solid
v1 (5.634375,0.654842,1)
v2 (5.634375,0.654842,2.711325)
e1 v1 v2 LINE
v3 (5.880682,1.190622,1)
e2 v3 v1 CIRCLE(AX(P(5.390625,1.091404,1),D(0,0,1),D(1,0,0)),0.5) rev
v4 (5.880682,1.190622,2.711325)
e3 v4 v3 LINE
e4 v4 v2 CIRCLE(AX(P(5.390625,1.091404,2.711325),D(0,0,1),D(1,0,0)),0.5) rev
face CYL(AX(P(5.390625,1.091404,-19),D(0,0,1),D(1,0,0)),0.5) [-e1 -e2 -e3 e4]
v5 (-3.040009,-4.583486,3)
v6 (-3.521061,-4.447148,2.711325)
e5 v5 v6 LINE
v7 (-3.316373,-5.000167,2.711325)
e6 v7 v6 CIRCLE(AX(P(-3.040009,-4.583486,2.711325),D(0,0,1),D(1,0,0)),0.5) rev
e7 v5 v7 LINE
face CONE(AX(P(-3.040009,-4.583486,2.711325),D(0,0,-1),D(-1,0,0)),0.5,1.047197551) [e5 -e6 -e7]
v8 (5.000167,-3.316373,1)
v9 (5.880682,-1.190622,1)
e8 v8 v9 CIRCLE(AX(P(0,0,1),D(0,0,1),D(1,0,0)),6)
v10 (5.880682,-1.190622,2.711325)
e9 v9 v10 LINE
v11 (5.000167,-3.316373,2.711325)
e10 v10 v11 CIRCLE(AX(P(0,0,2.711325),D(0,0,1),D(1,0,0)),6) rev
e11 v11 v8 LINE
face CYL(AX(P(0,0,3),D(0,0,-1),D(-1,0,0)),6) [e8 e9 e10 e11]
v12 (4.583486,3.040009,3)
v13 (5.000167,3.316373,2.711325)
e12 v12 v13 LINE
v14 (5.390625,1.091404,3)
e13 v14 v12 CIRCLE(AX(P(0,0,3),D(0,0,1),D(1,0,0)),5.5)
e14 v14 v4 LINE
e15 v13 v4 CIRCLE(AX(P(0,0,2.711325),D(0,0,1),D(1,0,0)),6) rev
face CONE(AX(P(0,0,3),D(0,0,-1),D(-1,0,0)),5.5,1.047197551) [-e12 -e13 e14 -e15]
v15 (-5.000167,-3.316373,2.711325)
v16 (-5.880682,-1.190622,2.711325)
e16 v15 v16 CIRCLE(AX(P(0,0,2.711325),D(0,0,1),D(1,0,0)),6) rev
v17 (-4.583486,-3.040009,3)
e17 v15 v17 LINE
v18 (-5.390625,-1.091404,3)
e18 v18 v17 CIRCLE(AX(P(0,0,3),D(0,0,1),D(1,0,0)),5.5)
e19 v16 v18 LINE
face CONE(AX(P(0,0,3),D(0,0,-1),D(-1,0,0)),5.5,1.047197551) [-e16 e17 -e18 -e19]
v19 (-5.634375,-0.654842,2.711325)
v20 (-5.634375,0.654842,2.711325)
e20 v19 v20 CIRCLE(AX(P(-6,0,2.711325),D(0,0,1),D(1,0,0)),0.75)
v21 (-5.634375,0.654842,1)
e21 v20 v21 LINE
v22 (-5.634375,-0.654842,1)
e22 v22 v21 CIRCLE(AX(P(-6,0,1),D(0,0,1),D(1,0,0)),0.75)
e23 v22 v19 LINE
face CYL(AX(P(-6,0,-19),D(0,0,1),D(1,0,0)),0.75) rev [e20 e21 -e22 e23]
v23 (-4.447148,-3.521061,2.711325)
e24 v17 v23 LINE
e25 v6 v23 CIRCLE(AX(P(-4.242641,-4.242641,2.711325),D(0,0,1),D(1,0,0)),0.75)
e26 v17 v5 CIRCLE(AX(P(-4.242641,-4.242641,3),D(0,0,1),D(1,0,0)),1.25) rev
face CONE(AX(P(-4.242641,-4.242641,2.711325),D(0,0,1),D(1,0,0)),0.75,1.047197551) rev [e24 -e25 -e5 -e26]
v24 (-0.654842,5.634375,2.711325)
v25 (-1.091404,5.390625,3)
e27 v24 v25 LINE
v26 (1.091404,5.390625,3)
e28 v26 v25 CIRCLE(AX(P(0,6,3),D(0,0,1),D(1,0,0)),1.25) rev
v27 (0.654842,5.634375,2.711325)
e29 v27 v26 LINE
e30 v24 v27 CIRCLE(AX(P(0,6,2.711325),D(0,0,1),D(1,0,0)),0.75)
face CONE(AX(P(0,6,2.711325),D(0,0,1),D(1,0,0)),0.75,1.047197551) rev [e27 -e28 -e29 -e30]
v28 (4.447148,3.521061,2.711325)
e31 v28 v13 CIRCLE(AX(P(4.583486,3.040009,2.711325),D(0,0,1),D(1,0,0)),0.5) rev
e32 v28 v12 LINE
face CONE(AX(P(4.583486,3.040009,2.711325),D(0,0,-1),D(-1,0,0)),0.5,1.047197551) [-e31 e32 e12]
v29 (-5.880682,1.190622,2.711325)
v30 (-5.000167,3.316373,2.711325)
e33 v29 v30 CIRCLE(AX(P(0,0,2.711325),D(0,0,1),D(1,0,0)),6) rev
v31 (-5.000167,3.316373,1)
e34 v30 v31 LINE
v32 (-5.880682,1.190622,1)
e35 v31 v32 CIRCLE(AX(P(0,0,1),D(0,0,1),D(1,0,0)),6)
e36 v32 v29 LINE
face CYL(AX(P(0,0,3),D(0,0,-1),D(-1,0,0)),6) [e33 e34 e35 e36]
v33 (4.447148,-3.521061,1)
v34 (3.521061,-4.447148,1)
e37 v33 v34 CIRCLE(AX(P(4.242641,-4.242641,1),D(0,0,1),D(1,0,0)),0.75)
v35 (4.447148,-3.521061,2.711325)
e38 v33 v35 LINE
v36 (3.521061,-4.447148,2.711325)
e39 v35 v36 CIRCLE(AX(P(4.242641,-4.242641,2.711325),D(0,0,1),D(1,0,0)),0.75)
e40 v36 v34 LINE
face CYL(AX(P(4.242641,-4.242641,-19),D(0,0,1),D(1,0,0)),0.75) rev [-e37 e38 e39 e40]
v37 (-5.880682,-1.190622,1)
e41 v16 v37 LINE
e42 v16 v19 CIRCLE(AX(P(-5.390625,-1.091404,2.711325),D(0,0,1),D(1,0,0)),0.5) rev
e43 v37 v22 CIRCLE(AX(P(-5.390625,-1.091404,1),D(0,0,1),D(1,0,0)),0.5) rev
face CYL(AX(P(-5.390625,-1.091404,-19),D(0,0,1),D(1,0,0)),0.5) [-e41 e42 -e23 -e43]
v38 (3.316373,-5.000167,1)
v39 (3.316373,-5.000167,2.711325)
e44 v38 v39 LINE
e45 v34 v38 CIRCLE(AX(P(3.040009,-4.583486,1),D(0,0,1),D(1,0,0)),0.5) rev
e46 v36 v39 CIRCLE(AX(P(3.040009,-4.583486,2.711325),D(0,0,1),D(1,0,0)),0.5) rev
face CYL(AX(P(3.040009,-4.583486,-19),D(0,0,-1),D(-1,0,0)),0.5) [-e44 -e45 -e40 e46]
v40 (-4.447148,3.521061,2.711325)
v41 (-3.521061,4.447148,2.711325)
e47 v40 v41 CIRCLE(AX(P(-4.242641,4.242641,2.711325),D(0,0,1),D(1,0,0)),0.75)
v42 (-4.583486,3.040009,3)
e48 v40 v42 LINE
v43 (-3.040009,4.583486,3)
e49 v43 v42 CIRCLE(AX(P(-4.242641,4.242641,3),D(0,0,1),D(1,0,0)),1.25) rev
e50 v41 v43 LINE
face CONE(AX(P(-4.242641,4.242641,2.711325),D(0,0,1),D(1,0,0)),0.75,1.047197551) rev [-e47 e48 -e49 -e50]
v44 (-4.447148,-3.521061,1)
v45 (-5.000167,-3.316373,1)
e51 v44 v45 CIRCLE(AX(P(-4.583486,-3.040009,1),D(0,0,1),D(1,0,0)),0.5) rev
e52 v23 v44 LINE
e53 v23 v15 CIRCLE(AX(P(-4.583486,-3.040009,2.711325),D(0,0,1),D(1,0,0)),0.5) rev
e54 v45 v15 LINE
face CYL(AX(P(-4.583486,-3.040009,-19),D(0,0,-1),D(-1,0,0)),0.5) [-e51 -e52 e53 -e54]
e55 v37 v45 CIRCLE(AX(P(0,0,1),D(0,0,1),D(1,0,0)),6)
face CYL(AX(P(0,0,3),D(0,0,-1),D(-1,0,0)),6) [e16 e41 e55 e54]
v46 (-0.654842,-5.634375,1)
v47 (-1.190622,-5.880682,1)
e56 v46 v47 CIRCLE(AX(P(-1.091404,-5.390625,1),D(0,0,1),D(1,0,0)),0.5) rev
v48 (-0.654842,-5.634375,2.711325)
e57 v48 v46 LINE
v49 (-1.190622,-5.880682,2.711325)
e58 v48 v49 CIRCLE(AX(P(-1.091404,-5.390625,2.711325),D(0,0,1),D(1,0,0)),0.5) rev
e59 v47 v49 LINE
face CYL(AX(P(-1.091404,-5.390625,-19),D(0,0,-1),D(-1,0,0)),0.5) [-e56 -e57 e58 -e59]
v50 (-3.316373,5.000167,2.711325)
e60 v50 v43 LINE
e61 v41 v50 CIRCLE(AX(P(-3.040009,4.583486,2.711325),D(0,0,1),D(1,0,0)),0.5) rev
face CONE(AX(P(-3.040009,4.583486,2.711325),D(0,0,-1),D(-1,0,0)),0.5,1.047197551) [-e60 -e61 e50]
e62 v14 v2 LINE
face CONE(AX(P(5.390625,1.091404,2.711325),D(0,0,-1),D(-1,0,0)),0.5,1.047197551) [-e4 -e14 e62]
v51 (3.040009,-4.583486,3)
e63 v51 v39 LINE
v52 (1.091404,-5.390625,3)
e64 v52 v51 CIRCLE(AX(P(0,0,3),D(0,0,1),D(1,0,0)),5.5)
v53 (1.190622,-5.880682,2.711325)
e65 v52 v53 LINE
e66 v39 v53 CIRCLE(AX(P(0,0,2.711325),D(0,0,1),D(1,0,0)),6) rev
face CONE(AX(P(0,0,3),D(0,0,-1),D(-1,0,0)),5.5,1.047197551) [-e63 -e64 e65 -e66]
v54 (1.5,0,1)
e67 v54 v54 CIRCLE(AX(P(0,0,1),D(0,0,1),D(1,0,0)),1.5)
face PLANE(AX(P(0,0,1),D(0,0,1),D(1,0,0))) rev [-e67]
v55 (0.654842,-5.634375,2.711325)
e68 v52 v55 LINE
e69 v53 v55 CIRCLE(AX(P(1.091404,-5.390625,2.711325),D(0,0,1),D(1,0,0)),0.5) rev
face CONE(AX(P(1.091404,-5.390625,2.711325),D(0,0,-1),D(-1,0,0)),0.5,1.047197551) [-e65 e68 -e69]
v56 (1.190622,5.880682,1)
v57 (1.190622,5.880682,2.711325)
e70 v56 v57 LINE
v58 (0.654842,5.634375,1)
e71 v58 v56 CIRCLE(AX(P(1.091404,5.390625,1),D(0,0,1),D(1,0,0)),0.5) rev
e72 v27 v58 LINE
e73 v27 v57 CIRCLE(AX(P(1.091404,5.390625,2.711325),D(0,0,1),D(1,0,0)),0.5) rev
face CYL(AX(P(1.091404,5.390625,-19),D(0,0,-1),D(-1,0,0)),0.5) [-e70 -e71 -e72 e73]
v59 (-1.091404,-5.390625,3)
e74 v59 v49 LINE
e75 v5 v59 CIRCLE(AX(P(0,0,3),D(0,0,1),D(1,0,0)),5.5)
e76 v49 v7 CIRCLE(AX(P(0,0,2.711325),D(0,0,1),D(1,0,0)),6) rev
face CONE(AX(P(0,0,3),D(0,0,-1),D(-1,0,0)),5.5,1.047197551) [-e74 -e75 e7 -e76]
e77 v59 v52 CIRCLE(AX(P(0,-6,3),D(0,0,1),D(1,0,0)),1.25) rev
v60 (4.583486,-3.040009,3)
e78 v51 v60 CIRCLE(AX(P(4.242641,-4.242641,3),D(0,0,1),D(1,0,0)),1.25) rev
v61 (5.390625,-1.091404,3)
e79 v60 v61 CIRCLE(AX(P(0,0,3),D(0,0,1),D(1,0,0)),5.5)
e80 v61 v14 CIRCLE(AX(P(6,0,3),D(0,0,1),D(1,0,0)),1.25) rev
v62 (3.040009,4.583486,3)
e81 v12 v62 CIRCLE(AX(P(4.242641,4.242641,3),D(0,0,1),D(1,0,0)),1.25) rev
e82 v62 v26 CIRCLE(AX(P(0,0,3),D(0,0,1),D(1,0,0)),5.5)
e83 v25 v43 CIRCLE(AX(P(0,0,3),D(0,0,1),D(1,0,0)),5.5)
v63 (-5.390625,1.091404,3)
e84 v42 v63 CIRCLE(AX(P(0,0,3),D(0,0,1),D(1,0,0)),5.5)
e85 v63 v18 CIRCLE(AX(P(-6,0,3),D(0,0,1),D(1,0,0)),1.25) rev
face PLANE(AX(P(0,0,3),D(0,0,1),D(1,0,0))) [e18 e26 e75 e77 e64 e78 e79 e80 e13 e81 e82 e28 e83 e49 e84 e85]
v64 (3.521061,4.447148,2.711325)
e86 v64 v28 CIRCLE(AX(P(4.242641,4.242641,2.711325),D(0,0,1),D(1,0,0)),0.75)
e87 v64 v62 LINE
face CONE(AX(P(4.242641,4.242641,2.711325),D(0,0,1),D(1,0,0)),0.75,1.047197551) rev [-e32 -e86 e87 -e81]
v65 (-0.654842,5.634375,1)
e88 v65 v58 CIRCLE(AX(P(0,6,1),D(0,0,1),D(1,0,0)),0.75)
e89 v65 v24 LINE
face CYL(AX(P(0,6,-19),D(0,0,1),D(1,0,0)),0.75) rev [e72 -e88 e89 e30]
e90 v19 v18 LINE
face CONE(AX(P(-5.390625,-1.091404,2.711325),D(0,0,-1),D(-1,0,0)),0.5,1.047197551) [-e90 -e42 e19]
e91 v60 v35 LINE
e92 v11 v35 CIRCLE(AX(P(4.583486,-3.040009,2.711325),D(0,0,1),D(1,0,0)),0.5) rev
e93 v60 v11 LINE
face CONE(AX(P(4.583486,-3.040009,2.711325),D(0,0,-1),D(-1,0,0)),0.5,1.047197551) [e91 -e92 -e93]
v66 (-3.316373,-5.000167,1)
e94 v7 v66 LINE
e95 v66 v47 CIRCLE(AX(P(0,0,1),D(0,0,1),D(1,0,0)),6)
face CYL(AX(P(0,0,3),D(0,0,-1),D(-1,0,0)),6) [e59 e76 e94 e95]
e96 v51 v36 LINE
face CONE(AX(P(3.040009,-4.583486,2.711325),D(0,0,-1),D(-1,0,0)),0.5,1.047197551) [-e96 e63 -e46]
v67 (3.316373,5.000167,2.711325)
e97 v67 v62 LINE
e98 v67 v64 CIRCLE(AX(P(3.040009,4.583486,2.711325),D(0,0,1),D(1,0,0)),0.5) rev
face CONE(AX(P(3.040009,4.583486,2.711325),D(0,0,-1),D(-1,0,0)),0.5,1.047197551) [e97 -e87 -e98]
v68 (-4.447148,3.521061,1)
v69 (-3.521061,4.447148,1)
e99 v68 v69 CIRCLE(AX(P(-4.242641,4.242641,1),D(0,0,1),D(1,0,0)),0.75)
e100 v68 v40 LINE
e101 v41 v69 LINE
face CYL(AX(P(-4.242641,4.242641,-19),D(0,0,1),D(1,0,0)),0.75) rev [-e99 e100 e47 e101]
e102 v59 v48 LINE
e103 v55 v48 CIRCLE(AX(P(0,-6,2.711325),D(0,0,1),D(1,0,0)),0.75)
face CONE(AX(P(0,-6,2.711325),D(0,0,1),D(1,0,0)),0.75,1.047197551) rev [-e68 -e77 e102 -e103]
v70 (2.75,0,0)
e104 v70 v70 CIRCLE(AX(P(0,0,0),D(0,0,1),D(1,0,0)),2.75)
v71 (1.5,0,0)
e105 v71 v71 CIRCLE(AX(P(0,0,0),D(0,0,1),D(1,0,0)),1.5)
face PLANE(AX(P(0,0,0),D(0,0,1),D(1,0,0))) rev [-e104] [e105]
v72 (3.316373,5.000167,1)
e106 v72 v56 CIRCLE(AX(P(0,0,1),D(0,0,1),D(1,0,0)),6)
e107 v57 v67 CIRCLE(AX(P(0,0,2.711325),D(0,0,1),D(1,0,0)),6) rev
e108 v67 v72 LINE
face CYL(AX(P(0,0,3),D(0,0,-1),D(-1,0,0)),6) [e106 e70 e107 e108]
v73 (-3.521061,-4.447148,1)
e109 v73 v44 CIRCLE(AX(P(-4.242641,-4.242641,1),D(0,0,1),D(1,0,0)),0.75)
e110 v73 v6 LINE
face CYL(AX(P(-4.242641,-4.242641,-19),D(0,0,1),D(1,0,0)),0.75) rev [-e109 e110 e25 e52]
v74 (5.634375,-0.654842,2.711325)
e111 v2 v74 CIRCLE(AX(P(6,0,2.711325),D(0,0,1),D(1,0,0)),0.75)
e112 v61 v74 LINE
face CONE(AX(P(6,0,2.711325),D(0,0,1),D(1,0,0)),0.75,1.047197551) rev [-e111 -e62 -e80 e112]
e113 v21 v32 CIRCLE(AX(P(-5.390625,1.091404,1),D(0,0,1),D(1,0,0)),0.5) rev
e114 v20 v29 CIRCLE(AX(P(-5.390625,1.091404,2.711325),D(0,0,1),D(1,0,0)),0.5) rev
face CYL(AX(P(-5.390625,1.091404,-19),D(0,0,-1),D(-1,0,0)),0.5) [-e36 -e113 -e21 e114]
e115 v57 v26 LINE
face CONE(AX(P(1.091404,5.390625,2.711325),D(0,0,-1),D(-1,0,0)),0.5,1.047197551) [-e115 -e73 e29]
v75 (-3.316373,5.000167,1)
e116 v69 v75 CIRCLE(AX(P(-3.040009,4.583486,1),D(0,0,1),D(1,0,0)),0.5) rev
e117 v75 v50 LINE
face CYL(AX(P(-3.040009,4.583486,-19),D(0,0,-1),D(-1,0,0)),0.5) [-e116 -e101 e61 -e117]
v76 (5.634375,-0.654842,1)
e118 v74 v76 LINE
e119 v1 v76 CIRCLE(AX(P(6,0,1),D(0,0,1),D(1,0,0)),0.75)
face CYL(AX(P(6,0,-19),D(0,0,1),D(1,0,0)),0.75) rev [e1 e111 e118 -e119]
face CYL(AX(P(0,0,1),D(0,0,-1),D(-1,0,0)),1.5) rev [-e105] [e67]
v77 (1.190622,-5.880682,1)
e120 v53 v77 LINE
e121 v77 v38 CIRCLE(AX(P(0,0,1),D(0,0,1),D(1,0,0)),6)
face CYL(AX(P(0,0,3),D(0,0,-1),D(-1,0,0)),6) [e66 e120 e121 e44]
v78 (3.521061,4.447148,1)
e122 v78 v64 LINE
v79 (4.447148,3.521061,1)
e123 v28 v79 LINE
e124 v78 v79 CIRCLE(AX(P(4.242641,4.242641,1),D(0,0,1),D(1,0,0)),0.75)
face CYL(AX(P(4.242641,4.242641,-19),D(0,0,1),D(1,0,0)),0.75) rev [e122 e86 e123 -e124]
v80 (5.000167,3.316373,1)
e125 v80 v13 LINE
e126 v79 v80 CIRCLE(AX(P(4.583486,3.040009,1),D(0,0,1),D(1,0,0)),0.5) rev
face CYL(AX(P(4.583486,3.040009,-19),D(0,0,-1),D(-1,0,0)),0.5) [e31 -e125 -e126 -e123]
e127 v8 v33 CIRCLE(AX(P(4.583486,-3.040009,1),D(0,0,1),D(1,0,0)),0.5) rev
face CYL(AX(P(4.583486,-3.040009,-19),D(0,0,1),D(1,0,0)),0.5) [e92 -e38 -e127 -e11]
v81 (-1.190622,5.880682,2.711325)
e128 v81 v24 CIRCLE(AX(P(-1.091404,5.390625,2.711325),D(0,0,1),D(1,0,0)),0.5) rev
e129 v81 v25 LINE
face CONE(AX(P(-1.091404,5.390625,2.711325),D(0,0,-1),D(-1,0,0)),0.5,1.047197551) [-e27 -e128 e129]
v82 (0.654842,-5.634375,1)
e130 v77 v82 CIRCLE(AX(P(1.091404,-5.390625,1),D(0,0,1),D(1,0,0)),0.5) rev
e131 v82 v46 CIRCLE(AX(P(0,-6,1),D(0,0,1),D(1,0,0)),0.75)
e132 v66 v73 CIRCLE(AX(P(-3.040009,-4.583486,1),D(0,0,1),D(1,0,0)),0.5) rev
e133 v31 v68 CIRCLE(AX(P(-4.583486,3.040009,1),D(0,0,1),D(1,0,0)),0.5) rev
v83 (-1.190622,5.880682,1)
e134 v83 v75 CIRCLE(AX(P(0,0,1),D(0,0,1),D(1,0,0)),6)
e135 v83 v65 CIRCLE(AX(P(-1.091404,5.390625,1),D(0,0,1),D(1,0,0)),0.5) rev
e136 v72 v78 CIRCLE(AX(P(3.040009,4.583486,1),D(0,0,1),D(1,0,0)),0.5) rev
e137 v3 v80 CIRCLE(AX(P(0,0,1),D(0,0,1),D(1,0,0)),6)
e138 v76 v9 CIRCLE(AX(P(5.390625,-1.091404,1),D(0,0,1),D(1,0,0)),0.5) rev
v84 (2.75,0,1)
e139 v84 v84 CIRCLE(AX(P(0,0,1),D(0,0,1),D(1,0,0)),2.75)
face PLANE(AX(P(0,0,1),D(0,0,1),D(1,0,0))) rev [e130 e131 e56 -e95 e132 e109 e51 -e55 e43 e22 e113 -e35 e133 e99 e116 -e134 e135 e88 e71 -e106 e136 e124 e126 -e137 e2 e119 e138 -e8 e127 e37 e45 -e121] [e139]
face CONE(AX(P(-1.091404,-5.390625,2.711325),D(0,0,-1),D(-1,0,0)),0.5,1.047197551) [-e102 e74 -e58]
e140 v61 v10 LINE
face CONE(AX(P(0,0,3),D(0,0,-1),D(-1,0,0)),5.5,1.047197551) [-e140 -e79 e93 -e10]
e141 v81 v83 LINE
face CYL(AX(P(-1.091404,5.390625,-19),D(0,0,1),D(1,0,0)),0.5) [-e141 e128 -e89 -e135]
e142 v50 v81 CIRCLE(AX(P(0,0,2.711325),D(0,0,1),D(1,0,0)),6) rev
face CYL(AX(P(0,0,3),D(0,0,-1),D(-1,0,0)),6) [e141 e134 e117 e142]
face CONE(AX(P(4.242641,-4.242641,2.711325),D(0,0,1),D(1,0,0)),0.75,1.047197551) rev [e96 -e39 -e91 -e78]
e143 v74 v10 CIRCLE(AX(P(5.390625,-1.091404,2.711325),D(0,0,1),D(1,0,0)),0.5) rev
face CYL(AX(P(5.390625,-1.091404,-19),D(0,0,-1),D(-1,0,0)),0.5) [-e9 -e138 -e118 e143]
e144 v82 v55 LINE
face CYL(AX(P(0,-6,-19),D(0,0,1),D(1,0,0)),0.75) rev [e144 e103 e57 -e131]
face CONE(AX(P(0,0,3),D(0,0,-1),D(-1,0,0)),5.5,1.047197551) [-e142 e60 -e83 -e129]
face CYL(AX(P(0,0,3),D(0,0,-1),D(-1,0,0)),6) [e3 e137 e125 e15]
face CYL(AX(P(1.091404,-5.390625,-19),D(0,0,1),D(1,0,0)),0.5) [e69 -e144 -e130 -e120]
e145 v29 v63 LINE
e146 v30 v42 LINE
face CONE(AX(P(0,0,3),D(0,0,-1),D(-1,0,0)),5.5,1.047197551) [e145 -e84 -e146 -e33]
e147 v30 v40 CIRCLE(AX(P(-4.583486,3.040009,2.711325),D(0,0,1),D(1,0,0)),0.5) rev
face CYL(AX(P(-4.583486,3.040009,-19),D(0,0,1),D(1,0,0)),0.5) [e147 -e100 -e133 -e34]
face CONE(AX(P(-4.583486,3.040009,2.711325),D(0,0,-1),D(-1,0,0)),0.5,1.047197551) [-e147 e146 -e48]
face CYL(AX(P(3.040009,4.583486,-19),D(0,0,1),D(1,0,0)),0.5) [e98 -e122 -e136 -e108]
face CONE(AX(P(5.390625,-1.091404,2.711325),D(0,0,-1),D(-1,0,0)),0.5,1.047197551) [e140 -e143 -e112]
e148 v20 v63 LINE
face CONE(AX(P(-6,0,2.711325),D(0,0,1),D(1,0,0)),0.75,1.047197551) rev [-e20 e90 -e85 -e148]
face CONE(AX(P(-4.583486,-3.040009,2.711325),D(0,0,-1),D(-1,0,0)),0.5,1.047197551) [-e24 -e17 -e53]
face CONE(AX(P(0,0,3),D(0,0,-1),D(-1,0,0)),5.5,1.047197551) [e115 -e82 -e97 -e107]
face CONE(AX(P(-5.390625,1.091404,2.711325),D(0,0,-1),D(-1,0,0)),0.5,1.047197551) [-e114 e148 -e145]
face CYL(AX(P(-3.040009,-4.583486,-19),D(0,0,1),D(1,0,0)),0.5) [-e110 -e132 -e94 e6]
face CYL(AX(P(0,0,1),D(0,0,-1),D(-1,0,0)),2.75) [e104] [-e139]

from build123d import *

# Parameters (mm, degrees)
SKETCH_1_R          = 2.75
SKETCH_1_R_2        = 1.5
EXTRUDE_1_DEPTH     = 1
SKETCH_2_R          = 6
EXTRUDE_2_DEPTH     = 2
SKETCH_3_R          = 0.75
CUT_EXTRUDE_1_DEPTH = 22
FILLET_1_R          = 0.5


with BuildPart() as part:
    # 草图1 → 凸台-拉伸1 (new body)
    with BuildSketch(Plane.XY):
        Circle(SKETCH_1_R)
        Circle(SKETCH_1_R_2, mode=Mode.SUBTRACT)
    extrude(amount=EXTRUDE_1_DEPTH)

    # 草图2 → 凸台-拉伸2 (add)
    with BuildSketch(Plane.XY.offset(1)):
        Circle(SKETCH_2_R)
    extrude(amount=EXTRUDE_2_DEPTH)

    # 草图3 → 切除-拉伸1 (cut)
    with BuildSketch(Plane.XY.offset(3)):
        with Locations((0, 6)):
            Circle(SKETCH_3_R)
        with Locations((4.242640687, 4.242640687)):
            Circle(SKETCH_3_R)
        with Locations((6, 0)):
            Circle(SKETCH_3_R)
        with Locations((4.242640687, -4.242640687)):
            Circle(SKETCH_3_R)
        with Locations((0, -6)):
            Circle(SKETCH_3_R)
        with Locations((-4.242640687, -4.242640687)):
            Circle(SKETCH_3_R)
        with Locations((-6, 0)):
            Circle(SKETCH_3_R)
        with Locations((-4.242640687, 4.242640687)):
            Circle(SKETCH_3_R)
    extrude(amount=-CUT_EXTRUDE_1_DEPTH, mode=Mode.SUBTRACT)

    # 圆角1
    fillet_1_edges = [part.edges().sort_by_distance(p)[0] for p in [
        (0.748533723, 5.953125, 2),
        (-0.748533723, 5.953125, 2),
        (4.738788328, 3.680201785, 2),
        (3.680201785, 4.738788328, 2),
        (5.953125, -0.748533723, 2),
        (5.953125, 0.748533723, 2),
        (3.680201785, -4.738788328, 2),
        (4.738788328, -3.680201785, 2),
        (-0.748533723, -5.953125, 2),
        (0.748533723, -5.953125, 2),
        (-4.738788328, -3.680201785, 2),
        (-3.680201785, -4.738788328, 2),
        (-5.953125, 0.748533723, 2),
        (-5.953125, -0.748533723, 2),
        (-3.680201785, 4.738788328, 2),
        (-4.738788328, 3.680201785, 2),
    ]]
    fillet(fillet_1_edges, radius=FILLET_1_R)

    # 倒角1
    # the kernel refuses this chamfer: 0.5, 0.288675135 mm, written as the material it takes off along each edge
    with BuildSketch(Plane(origin=(4.242640687, 4.242640687, 3), x_dir=(-0.9621057405727662, 0.27267662891588135, 0), z_dir=(0.27267662891588135, 0.9621057405727662, 0))) as chamfer_1_piece_1:
        with BuildLine():
            Line((1.267320508, 0.01), (0.732679492, -0.298675135))
            Line((0.732679492, -0.298675135), (0.722679492, -0.298675135))
            ThreePointArc((0.722679492, -0.298675135), (0.74, -0.149337567), (0.74, 0))
            Line((0.74, 0), (0.75, 0.01))
            ThreePointArc((0.75, 0.01), (1.008660254, 0.01), (1.267320508, 0.02))
            Line((1.267320508, 0.02), (1.267320508, 0.01))
        make_face()
    revolve(axis=Axis((4.242640687, 4.242640687, 3), (0, 0, 1)), revolution_arc=121.64720829, mode=Mode.SUBTRACT)
    with BuildSketch(Plane(origin=(0, 6, 3), x_dir=(-0.8731229867550157, -0.48750000000000077, 0), z_dir=(-0.48750000000000077, 0.8731229867550157, 0))) as chamfer_1_piece_2:
        with BuildLine():
            Line((1.267320508, 0.01), (0.732679492, -0.298675135))
            Line((0.732679492, -0.298675135), (0.722679492, -0.298675135))
            ThreePointArc((0.722679492, -0.298675135), (0.74, -0.149337567), (0.74, 0))
            Line((0.74, 0), (0.75, 0.01))
            ThreePointArc((0.75, 0.01), (1.008660254, 0.01), (1.267320508, 0.02))
            Line((1.267320508, 0.02), (1.267320508, 0.01))
        make_face()
    revolve(axis=Axis((0, 6, 3), (0, 0, 1)), revolution_arc=121.64720829, mode=Mode.SUBTRACT)
    with BuildSketch(Plane(origin=(0, 0, 3), x_dir=(-0.19843704244432184, 0.9801136363636364, 0), z_dir=(0.9801136363636364, 0.19843704244432184, 0))) as chamfer_1_piece_3:
        with BuildLine():
            Line((5.482679492, 0.01), (6.017320508, -0.298675135))
            Line((6.017320508, -0.298675135), (6.027320508, -0.298675135))
            ThreePointArc((6.027320508, -0.298675135), (6.01, -0.149337567), (6.01, 0))
            Line((6.01, 0), (6, 0.01))
            ThreePointArc((6, 0.01), (5.741339746, 0.01), (5.482679492, 0.02))
            Line((5.482679492, 0.02), (5.482679492, 0.01))
        make_face()
    revolve(axis=Axis((0, 0, 3), (0, 0, 1)), revolution_arc=22.108847212, mode=Mode.SUBTRACT)
    with BuildSketch(Plane(origin=(-4.242640687, 4.242640687, 3), x_dir=(0.9621057405727664, 0.27267662891588074, 0), z_dir=(-0.27267662891588074, 0.9621057405727664, 0))) as chamfer_1_piece_4:
        with BuildLine():
            Line((1.267320508, -0.01), (0.732679492, 0.298675135))
            Line((0.732679492, 0.298675135), (0.722679492, 0.298675135))
            ThreePointArc((0.722679492, 0.298675135), (0.74, 0.149337567), (0.74, 0))
            Line((0.74, 0), (0.75, -0.01))
            ThreePointArc((0.75, -0.01), (1.008660254, -0.01), (1.267320508, -0.02))
            Line((1.267320508, -0.02), (1.267320508, -0.01))
        make_face()
    revolve(axis=Axis((-4.242640687, 4.242640687, 3), (0, 0, -1)), revolution_arc=121.64720829, mode=Mode.SUBTRACT)
    with BuildSketch(Plane(origin=(0, 0, 3), x_dir=(-0.8333611769571161, 0.5527288202551504, 0), z_dir=(0.5527288202551504, 0.8333611769571161, 0))) as chamfer_1_piece_5:
        with BuildLine():
            Line((5.482679492, 0.01), (6.017320508, -0.298675135))
            Line((6.017320508, -0.298675135), (6.027320508, -0.298675135))
            ThreePointArc((6.027320508, -0.298675135), (6.01, -0.149337567), (6.01, 0))
            Line((6.01, 0), (6, 0.01))
            ThreePointArc((6, 0.01), (5.741339746, 0.01), (5.482679492, 0.02))
            Line((5.482679492, 0.02), (5.482679492, 0.01))
        make_face()
    revolve(axis=Axis((0, 0, 3), (0, 0, 1)), revolution_arc=22.108847212, mode=Mode.SUBTRACT)
    with BuildSketch(Plane(origin=(-6, 0, 3), x_dir=(0.48750000000000004, 0.873122986755016, 0), z_dir=(-0.873122986755016, 0.48750000000000004, 0))) as chamfer_1_piece_6:
        with BuildLine():
            Line((1.267320508, -0.01), (0.732679492, 0.298675135))
            Line((0.732679492, 0.298675135), (0.722679492, 0.298675135))
            ThreePointArc((0.722679492, 0.298675135), (0.74, 0.149337567), (0.74, 0))
            Line((0.74, 0), (0.75, -0.01))
            ThreePointArc((0.75, -0.01), (1.008660254, -0.01), (1.267320508, -0.02))
            Line((1.267320508, -0.02), (1.267320508, -0.01))
        make_face()
    revolve(axis=Axis((-6, 0, 3), (0, 0, -1)), revolution_arc=121.64720829, mode=Mode.SUBTRACT)
    with BuildSketch(Plane(origin=(0, 0, 3), x_dir=(-0.9801136363636364, -0.198437042444322, 0), z_dir=(-0.198437042444322, 0.9801136363636364, 0))) as chamfer_1_piece_7:
        with BuildLine():
            Line((5.482679492, 0.01), (6.017320508, -0.298675135))
            Line((6.017320508, -0.298675135), (6.027320508, -0.298675135))
            ThreePointArc((6.027320508, -0.298675135), (6.01, -0.149337567), (6.01, 0))
            Line((6.01, 0), (6, 0.01))
            ThreePointArc((6, 0.01), (5.741339746, 0.01), (5.482679492, 0.02))
            Line((5.482679492, 0.02), (5.482679492, 0.01))
        make_face()
    revolve(axis=Axis((0, 0, 3), (0, 0, 1)), revolution_arc=22.108847212, mode=Mode.SUBTRACT)
    with BuildSketch(Plane(origin=(-4.242640687, -4.242640687, 3), x_dir=(-0.27267662891588196, 0.962105740572766, 0), z_dir=(-0.962105740572766, -0.27267662891588196, 0))) as chamfer_1_piece_8:
        with BuildLine():
            Line((1.267320508, -0.01), (0.732679492, 0.298675135))
            Line((0.732679492, 0.298675135), (0.722679492, 0.298675135))
            ThreePointArc((0.722679492, 0.298675135), (0.74, 0.149337567), (0.74, 0))
            Line((0.74, 0), (0.75, -0.01))
            ThreePointArc((0.75, -0.01), (1.008660254, -0.01), (1.267320508, -0.02))
            Line((1.267320508, -0.02), (1.267320508, -0.01))
        make_face()
    revolve(axis=Axis((-4.242640687, -4.242640687, 3), (0, 0, -1)), revolution_arc=121.64720829, mode=Mode.SUBTRACT)
    with BuildSketch(Plane(origin=(0, 0, 3), x_dir=(-0.5527288202551508, -0.8333611769571158, 0), z_dir=(-0.8333611769571158, 0.5527288202551508, 0))) as chamfer_1_piece_9:
        with BuildLine():
            Line((5.482679492, 0.01), (6.017320508, -0.298675135))
            Line((6.017320508, -0.298675135), (6.027320508, -0.298675135))
            ThreePointArc((6.027320508, -0.298675135), (6.01, -0.149337567), (6.01, 0))
            Line((6.01, 0), (6, 0.01))
            ThreePointArc((6, 0.01), (5.741339746, 0.01), (5.482679492, 0.02))
            Line((5.482679492, 0.02), (5.482679492, 0.01))
        make_face()
    revolve(axis=Axis((0, 0, 3), (0, 0, 1)), revolution_arc=22.108847212, mode=Mode.SUBTRACT)
    with BuildSketch(Plane(origin=(0, -6, 3), x_dir=(0.8731229867550155, 0.48750000000000077, 0), z_dir=(0.48750000000000077, -0.8731229867550155, 0))) as chamfer_1_piece_10:
        with BuildLine():
            Line((1.267320508, 0.01), (0.732679492, -0.298675135))
            Line((0.732679492, -0.298675135), (0.722679492, -0.298675135))
            ThreePointArc((0.722679492, -0.298675135), (0.74, -0.149337567), (0.74, 0))
            Line((0.74, 0), (0.75, 0.01))
            ThreePointArc((0.75, 0.01), (1.008660254, 0.01), (1.267320508, 0.02))
            Line((1.267320508, 0.02), (1.267320508, 0.01))
        make_face()
    revolve(axis=Axis((0, -6, 3), (0, 0, 1)), revolution_arc=121.64720829, mode=Mode.SUBTRACT)
    with BuildSketch(Plane(origin=(0, 0, 3), x_dir=(0.1984370424443215, -0.9801136363636364, 0), z_dir=(-0.9801136363636364, -0.1984370424443215, 0))) as chamfer_1_piece_11:
        with BuildLine():
            Line((5.482679492, 0.01), (6.017320508, -0.298675135))
            Line((6.017320508, -0.298675135), (6.027320508, -0.298675135))
            ThreePointArc((6.027320508, -0.298675135), (6.01, -0.149337567), (6.01, 0))
            Line((6.01, 0), (6, 0.01))
            ThreePointArc((6, 0.01), (5.741339746, 0.01), (5.482679492, 0.02))
            Line((5.482679492, 0.02), (5.482679492, 0.01))
        make_face()
    revolve(axis=Axis((0, 0, 3), (0, 0, 1)), revolution_arc=22.108847212, mode=Mode.SUBTRACT)
    with BuildSketch(Plane(origin=(4.242640687, -4.242640687, 3), x_dir=(0.2726766289158815, 0.9621057405727662, 0), z_dir=(0.9621057405727662, -0.2726766289158815, 0))) as chamfer_1_piece_12:
        with BuildLine():
            Line((1.267320508, 0.01), (0.732679492, -0.298675135))
            Line((0.732679492, -0.298675135), (0.722679492, -0.298675135))
            ThreePointArc((0.722679492, -0.298675135), (0.74, -0.149337567), (0.74, 0))
            Line((0.74, 0), (0.75, 0.01))
            ThreePointArc((0.75, 0.01), (1.008660254, 0.01), (1.267320508, 0.02))
            Line((1.267320508, 0.02), (1.267320508, 0.01))
        make_face()
    revolve(axis=Axis((4.242640687, -4.242640687, 3), (0, 0, 1)), revolution_arc=121.64720829, mode=Mode.SUBTRACT)
    with BuildSketch(Plane(origin=(0, 0, 3), x_dir=(0.8333611769571158, -0.5527288202551508, 0), z_dir=(-0.5527288202551508, -0.8333611769571158, 0))) as chamfer_1_piece_13:
        with BuildLine():
            Line((5.482679492, 0.01), (6.017320508, -0.298675135))
            Line((6.017320508, -0.298675135), (6.027320508, -0.298675135))
            ThreePointArc((6.027320508, -0.298675135), (6.01, -0.149337567), (6.01, 0))
            Line((6.01, 0), (6, 0.01))
            ThreePointArc((6, 0.01), (5.741339746, 0.01), (5.482679492, 0.02))
            Line((5.482679492, 0.02), (5.482679492, 0.01))
        make_face()
    revolve(axis=Axis((0, 0, 3), (0, 0, 1)), revolution_arc=22.108847212, mode=Mode.SUBTRACT)
    with BuildSketch(Plane(origin=(6, 0, 3), x_dir=(-0.48750000000000004, 0.8731229867550161, 0), z_dir=(0.8731229867550161, 0.48750000000000004, 0))) as chamfer_1_piece_14:
        with BuildLine():
            Line((1.267320508, 0.01), (0.732679492, -0.298675135))
            Line((0.732679492, -0.298675135), (0.722679492, -0.298675135))
            ThreePointArc((0.722679492, -0.298675135), (0.74, -0.149337567), (0.74, 0))
            Line((0.74, 0), (0.75, 0.01))
            ThreePointArc((0.75, 0.01), (1.008660254, 0.01), (1.267320508, 0.02))
            Line((1.267320508, 0.02), (1.267320508, 0.01))
        make_face()
    revolve(axis=Axis((6, 0, 3), (0, 0, 1)), revolution_arc=121.64720829, mode=Mode.SUBTRACT)
    with BuildSketch(Plane(origin=(0, 0, 3), x_dir=(0.9801136363636362, 0.19843704244432203, 0), z_dir=(0.19843704244432203, -0.9801136363636362, 0))) as chamfer_1_piece_15:
        with BuildLine():
            Line((6.017320508, -0.298675135), (5.482679492, 0.01))
            Line((5.482679492, 0.01), (5.482679492, 0.02))
            ThreePointArc((5.482679492, 0.02), (5.741339746, 0.01), (6, 0.01))
            Line((6, 0.01), (6.01, 0))
            ThreePointArc((6.01, 0), (6.01, -0.149337567), (6.027320508, -0.298675135))
            Line((6.027320508, -0.298675135), (6.017320508, -0.298675135))
        make_face()
    revolve(axis=Axis((0, 0, 3), (0, 0, 1)), revolution_arc=22.108847212, mode=Mode.SUBTRACT)
    with BuildSketch(Plane(origin=(1.091403731, 5.390625004, 3), x_dir=(-0.873122989459575, 0.4874999951560769, 0), z_dir=(-0.4874999951560769, -0.873122989459575, 0))) as chamfer_1_piece_16:
        with BuildLine():
            Line((0, 2e-09), (0.517320503, 0.298675135))
            Line((0.517320503, 0.298675135), (0.527320503, 0.298675135))
            ThreePointArc((0.527320503, 0.298675135), (0.509999995, 0.149337567), (0.509999996, 0))
            Line((0.509999996, 0), (0.499999996, -0.01))
            Line((0.499999996, -0.01), (0, -0.019665188))
            Line((0, -0.019665188), (0, 2e-09))
        make_face()
    revolve(axis=Axis((1.091403731, 5.390625004, 3), (0, 0, -1)), revolution_arc=72.269181175, mode=Mode.SUBTRACT)
    with BuildSketch(Plane(origin=(-1.091403731, 5.390625004, 3), x_dir=(-0.19843704788178793, 0.9801136352627491, 0), z_dir=(-0.9801136352627491, -0.19843704788178793, 0))) as chamfer_1_piece_17:
        with BuildLine():
            Line((0, 2e-09), (0.517320503, 0.298675135))
            Line((0.517320503, 0.298675135), (0.527320503, 0.298675135))
            ThreePointArc((0.527320503, 0.298675135), (0.509999995, 0.149337567), (0.509999996, 0))
            Line((0.509999996, 0), (0.499999996, -0.01))
            Line((0.499999996, -0.01), (0, -0.019665188))
            Line((0, -0.019665188), (0, 2e-09))
        make_face()
    revolve(axis=Axis((-1.091403731, 5.390625004, 3), (0, 0, -1)), revolution_arc=72.269181175, mode=Mode.SUBTRACT)
    with BuildSketch(Plane(origin=(-3.040008516, 4.583486475, 3), x_dir=(-0.9621057390600083, -0.27267663425346006, 0), z_dir=(0.27267663425346006, -0.9621057390600083, 0))) as chamfer_1_piece_18:
        with BuildLine():
            Line((0, 2e-09), (0.517320503, 0.298675135))
            Line((0.517320503, 0.298675135), (0.527320503, 0.298675135))
            ThreePointArc((0.527320503, 0.298675135), (0.509999995, 0.149337567), (0.509999996, 0))
            Line((0.509999996, 0), (0.499999996, -0.01))
            Line((0.499999996, -0.01), (0, -0.019665188))
            Line((0, -0.019665188), (0, 2e-09))
        make_face()
    revolve(axis=Axis((-3.040008516, 4.583486475, 3), (0, 0, -1)), revolution_arc=72.269181175, mode=Mode.SUBTRACT)
    with BuildSketch(Plane(origin=(-4.583486475, 3.040008516, 3), x_dir=(-0.8333611800235503, 0.5527288156318211, 0), z_dir=(-0.5527288156318211, -0.8333611800235503, 0))) as chamfer_1_piece_19:
        with BuildLine():
            Line((0, 2e-09), (0.517320503, 0.298675135))
            Line((0.517320503, 0.298675135), (0.527320503, 0.298675135))
            ThreePointArc((0.527320503, 0.298675135), (0.509999995, 0.149337567), (0.509999996, 0))
            Line((0.509999996, 0), (0.499999996, -0.01))
            Line((0.499999996, -0.01), (0, -0.019665188))
            Line((0, -0.019665188), (0, 2e-09))
        make_face()
    revolve(axis=Axis((-4.583486475, 3.040008516, 3), (0, 0, -1)), revolution_arc=72.269181175, mode=Mode.SUBTRACT)
    with BuildSketch(Plane(origin=(-5.390625004, 1.091403731, 3), x_dir=(-0.48749999515608566, -0.8731229894595701, 0), z_dir=(0.8731229894595701, -0.48749999515608566, 0))) as chamfer_1_piece_20:
        with BuildLine():
            Line((0, 2e-09), (0.517320503, 0.298675135))
            Line((0.517320503, 0.298675135), (0.527320503, 0.298675135))
            ThreePointArc((0.527320503, 0.298675135), (0.509999995, 0.149337567), (0.509999996, 0))
            Line((0.509999996, 0), (0.499999996, -0.01))
            Line((0.499999996, -0.01), (0, -0.019665188))
            Line((0, -0.019665188), (0, 2e-09))
        make_face()
    revolve(axis=Axis((-5.390625004, 1.091403731, 3), (0, 0, -1)), revolution_arc=72.269181175, mode=Mode.SUBTRACT)
    with BuildSketch(Plane(origin=(-5.390625004, -1.091403731, 3), x_dir=(-0.9801136352627474, -0.19843704788179609, 0), z_dir=(0.19843704788179609, -0.9801136352627474, 0))) as chamfer_1_piece_21:
        with BuildLine():
            Line((0, 2e-09), (0.517320503, 0.298675135))
            Line((0.517320503, 0.298675135), (0.527320503, 0.298675135))
            ThreePointArc((0.527320503, 0.298675135), (0.509999995, 0.149337567), (0.509999996, 0))
            Line((0.509999996, 0), (0.499999996, -0.01))
            Line((0.499999996, -0.01), (0, -0.019665188))
            Line((0, -0.019665188), (0, 2e-09))
        make_face()
    revolve(axis=Axis((-5.390625004, -1.091403731, 3), (0, 0, -1)), revolution_arc=72.269181175, mode=Mode.SUBTRACT)
    with BuildSketch(Plane(origin=(-4.583486475, -3.040008516, 3), x_dir=(0.2726766342534678, -0.9621057390600061, 0), z_dir=(0.9621057390600061, 0.2726766342534678, 0))) as chamfer_1_piece_22:
        with BuildLine():
            Line((0, 2e-09), (0.517320503, 0.298675135))
            Line((0.517320503, 0.298675135), (0.527320503, 0.298675135))
            ThreePointArc((0.527320503, 0.298675135), (0.509999995, 0.149337567), (0.509999996, 0))
            Line((0.509999996, 0), (0.499999996, -0.01))
            Line((0.499999996, -0.01), (0, -0.019665188))
            Line((0, -0.019665188), (0, 2e-09))
        make_face()
    revolve(axis=Axis((-4.583486475, -3.040008516, 3), (0, 0, -1)), revolution_arc=72.269181175, mode=Mode.SUBTRACT)
    with BuildSketch(Plane(origin=(-3.040008516, -4.583486475, 3), x_dir=(-0.5527288156318109, -0.8333611800235572, 0), z_dir=(0.8333611800235572, -0.5527288156318109, 0))) as chamfer_1_piece_23:
        with BuildLine():
            Line((0, 2e-09), (0.517320503, 0.298675135))
            Line((0.517320503, 0.298675135), (0.527320503, 0.298675135))
            ThreePointArc((0.527320503, 0.298675135), (0.509999995, 0.149337567), (0.509999996, 0))
            Line((0.509999996, 0), (0.499999996, -0.01))
            Line((0.499999996, -0.01), (0, -0.019665188))
            Line((0, -0.019665188), (0, 2e-09))
        make_face()
    revolve(axis=Axis((-3.040008516, -4.583486475, 3), (0, 0, -1)), revolution_arc=72.269181175, mode=Mode.SUBTRACT)
    with BuildSketch(Plane(origin=(1.091403731, -5.390625004, 3), x_dir=(0.19843704788180544, -0.9801136352627454, 0), z_dir=(0.9801136352627454, 0.19843704788180544, 0))) as chamfer_1_piece_24:
        with BuildLine():
            Line((0, 2e-09), (0.517320503, 0.298675135))
            Line((0.517320503, 0.298675135), (0.527320503, 0.298675135))
            ThreePointArc((0.527320503, 0.298675135), (0.509999995, 0.149337567), (0.509999996, 0))
            Line((0.509999996, 0), (0.499999996, -0.01))
            Line((0.499999996, -0.01), (0, -0.019665188))
            Line((0, -0.019665188), (0, 2e-09))
        make_face()
    revolve(axis=Axis((1.091403731, -5.390625004, 3), (0, 0, -1)), revolution_arc=72.269181175, mode=Mode.SUBTRACT)
    with BuildSketch(Plane(origin=(-1.091403731, -5.390625004, 3), x_dir=(0.8731229894595748, -0.48749999515607717, 0), z_dir=(0.48749999515607717, 0.8731229894595748, 0))) as chamfer_1_piece_25:
        with BuildLine():
            Line((0, 2e-09), (0.517320503, 0.298675135))
            Line((0.517320503, 0.298675135), (0.527320503, 0.298675135))
            ThreePointArc((0.527320503, 0.298675135), (0.509999995, 0.149337567), (0.509999996, 0))
            Line((0.509999996, 0), (0.499999996, -0.01))
            Line((0.499999996, -0.01), (0, -0.019665188))
            Line((0, -0.019665188), (0, 2e-09))
        make_face()
    revolve(axis=Axis((-1.091403731, -5.390625004, 3), (0, 0, -1)), revolution_arc=72.269181175, mode=Mode.SUBTRACT)
    with BuildSketch(Plane(origin=(3.040008516, -4.583486475, 3), x_dir=(0.9621057390600103, 0.27267663425345307, 0), z_dir=(-0.27267663425345307, 0.9621057390600103, 0))) as chamfer_1_piece_26:
        with BuildLine():
            Line((0, 2e-09), (0.517320503, 0.298675135))
            Line((0.517320503, 0.298675135), (0.527320503, 0.298675135))
            ThreePointArc((0.527320503, 0.298675135), (0.509999995, 0.149337567), (0.509999996, 0))
            Line((0.509999996, 0), (0.499999996, -0.01))
            Line((0.499999996, -0.01), (0, -0.019665188))
            Line((0, -0.019665188), (0, 2e-09))
        make_face()
    revolve(axis=Axis((3.040008516, -4.583486475, 3), (0, 0, -1)), revolution_arc=72.269181175, mode=Mode.SUBTRACT)
    with BuildSketch(Plane(origin=(4.583486475, -3.040008516, 3), x_dir=(0.8333611800235367, -0.5527288156318417, 0), z_dir=(0.5527288156318417, 0.8333611800235367, 0))) as chamfer_1_piece_27:
        with BuildLine():
            Line((0, 2e-09), (0.517320503, 0.298675135))
            Line((0.517320503, 0.298675135), (0.527320503, 0.298675135))
            ThreePointArc((0.527320503, 0.298675135), (0.509999995, 0.149337567), (0.509999996, 0))
            Line((0.509999996, 0), (0.499999996, -0.01))
            Line((0.499999996, -0.01), (0, -0.019665188))
            Line((0, -0.019665188), (0, 2e-09))
        make_face()
    revolve(axis=Axis((4.583486475, -3.040008516, 3), (0, 0, -1)), revolution_arc=72.269181175, mode=Mode.SUBTRACT)
    with BuildSketch(Plane(origin=(5.390625004, 1.091403731, 3), x_dir=(0.9801136352627478, 0.1984370478817941, 0), z_dir=(-0.1984370478817941, 0.9801136352627478, 0))) as chamfer_1_piece_28:
        with BuildLine():
            Line((0.517320503, 0.298675135), (0, 2e-09))
            Line((0, 2e-09), (0, -0.019665188))
            Line((0, -0.019665188), (0.499999996, -0.01))
            Line((0.499999996, -0.01), (0.509999996, 0))
            ThreePointArc((0.509999996, 0), (0.509999995, 0.149337567), (0.527320503, 0.298675135))
            Line((0.527320503, 0.298675135), (0.517320503, 0.298675135))
        make_face()
    revolve(axis=Axis((5.390625004, 1.091403731, 3), (0, 0, -1)), revolution_arc=72.269181175, mode=Mode.SUBTRACT)
    with BuildSketch(Plane(origin=(5.390625004, -1.091403731, 3), x_dir=(0.4874999951560918, 0.8731229894595666, 0), z_dir=(-0.8731229894595666, 0.4874999951560918, 0))) as chamfer_1_piece_29:
        with BuildLine():
            Line((0, 2e-09), (0.517320503, 0.298675135))
            Line((0.517320503, 0.298675135), (0.527320503, 0.298675135))
            ThreePointArc((0.527320503, 0.298675135), (0.509999995, 0.149337567), (0.509999996, 0))
            Line((0.509999996, 0), (0.499999996, -0.01))
            Line((0.499999996, -0.01), (0, -0.019665188))
            Line((0, -0.019665188), (0, 2e-09))
        make_face()
    revolve(axis=Axis((5.390625004, -1.091403731, 3), (0, 0, -1)), revolution_arc=72.269181175, mode=Mode.SUBTRACT)
    with BuildSketch(Plane(origin=(4.583486475, 3.040008516, 3), x_dir=(0.833361180023539, 0.5527288156318383, 0), z_dir=(0.5527288156318383, -0.833361180023539, 0))) as chamfer_1_piece_30:
        with BuildLine():
            Line((0.517320503, -0.298675135), (0, -2e-09))
            Line((0, -2e-09), (0, 0.019665188))
            Line((0, 0.019665188), (0.499999996, 0.01))
            Line((0.499999996, 0.01), (0.509999996, 0))
            ThreePointArc((0.509999996, 0), (0.509999995, -0.149337567), (0.527320503, -0.298675135))
            Line((0.527320503, -0.298675135), (0.517320503, -0.298675135))
        make_face()
    revolve(axis=Axis((4.583486475, 3.040008516, 3), (0, 0, 1)), revolution_arc=72.269181175, mode=Mode.SUBTRACT)
    with BuildSketch(Plane(origin=(3.040008516, 4.583486475, 3), x_dir=(0.5527288156318306, 0.833361180023544, 0), z_dir=(-0.833361180023544, 0.5527288156318306, 0))) as chamfer_1_piece_31:
        with BuildLine():
            Line((0, 2e-09), (0.517320503, 0.298675135))
            Line((0.517320503, 0.298675135), (0.527320503, 0.298675135))
            ThreePointArc((0.527320503, 0.298675135), (0.509999995, 0.149337567), (0.509999996, 0))
            Line((0.509999996, 0), (0.499999996, -0.01))
            Line((0.499999996, -0.01), (0, -0.019665188))
            Line((0, -0.019665188), (0, 2e-09))
        make_face()
    revolve(axis=Axis((3.040008516, 4.583486475, 3), (0, 0, -1)), revolution_arc=72.269181175, mode=Mode.SUBTRACT)
    with BuildSketch(Plane(origin=(0, 0, 3), x_dir=(0.5527288202551502, 0.8333611769571161, 0), z_dir=(0.8333611769571161, -0.5527288202551502, 0))) as chamfer_1_piece_32:
        with BuildLine():
            Line((5.482679492, 0.01), (6.017320508, -0.298675135))
            Line((6.017320508, -0.298675135), (6.027320508, -0.298675135))
            ThreePointArc((6.027320508, -0.298675135), (6.01, -0.149337567), (6.01, 0))
            Line((6.01, 0), (6, 0.01))
            ThreePointArc((6, 0.01), (5.741339746, 0.01), (5.482679492, 0.02))
            Line((5.482679492, 0.02), (5.482679492, 0.01))
        make_face()
    revolve(axis=Axis((0, 0, 3), (0, 0, 1)), revolution_arc=22.108847212, mode=Mode.SUBTRACT)


solid = part.part
